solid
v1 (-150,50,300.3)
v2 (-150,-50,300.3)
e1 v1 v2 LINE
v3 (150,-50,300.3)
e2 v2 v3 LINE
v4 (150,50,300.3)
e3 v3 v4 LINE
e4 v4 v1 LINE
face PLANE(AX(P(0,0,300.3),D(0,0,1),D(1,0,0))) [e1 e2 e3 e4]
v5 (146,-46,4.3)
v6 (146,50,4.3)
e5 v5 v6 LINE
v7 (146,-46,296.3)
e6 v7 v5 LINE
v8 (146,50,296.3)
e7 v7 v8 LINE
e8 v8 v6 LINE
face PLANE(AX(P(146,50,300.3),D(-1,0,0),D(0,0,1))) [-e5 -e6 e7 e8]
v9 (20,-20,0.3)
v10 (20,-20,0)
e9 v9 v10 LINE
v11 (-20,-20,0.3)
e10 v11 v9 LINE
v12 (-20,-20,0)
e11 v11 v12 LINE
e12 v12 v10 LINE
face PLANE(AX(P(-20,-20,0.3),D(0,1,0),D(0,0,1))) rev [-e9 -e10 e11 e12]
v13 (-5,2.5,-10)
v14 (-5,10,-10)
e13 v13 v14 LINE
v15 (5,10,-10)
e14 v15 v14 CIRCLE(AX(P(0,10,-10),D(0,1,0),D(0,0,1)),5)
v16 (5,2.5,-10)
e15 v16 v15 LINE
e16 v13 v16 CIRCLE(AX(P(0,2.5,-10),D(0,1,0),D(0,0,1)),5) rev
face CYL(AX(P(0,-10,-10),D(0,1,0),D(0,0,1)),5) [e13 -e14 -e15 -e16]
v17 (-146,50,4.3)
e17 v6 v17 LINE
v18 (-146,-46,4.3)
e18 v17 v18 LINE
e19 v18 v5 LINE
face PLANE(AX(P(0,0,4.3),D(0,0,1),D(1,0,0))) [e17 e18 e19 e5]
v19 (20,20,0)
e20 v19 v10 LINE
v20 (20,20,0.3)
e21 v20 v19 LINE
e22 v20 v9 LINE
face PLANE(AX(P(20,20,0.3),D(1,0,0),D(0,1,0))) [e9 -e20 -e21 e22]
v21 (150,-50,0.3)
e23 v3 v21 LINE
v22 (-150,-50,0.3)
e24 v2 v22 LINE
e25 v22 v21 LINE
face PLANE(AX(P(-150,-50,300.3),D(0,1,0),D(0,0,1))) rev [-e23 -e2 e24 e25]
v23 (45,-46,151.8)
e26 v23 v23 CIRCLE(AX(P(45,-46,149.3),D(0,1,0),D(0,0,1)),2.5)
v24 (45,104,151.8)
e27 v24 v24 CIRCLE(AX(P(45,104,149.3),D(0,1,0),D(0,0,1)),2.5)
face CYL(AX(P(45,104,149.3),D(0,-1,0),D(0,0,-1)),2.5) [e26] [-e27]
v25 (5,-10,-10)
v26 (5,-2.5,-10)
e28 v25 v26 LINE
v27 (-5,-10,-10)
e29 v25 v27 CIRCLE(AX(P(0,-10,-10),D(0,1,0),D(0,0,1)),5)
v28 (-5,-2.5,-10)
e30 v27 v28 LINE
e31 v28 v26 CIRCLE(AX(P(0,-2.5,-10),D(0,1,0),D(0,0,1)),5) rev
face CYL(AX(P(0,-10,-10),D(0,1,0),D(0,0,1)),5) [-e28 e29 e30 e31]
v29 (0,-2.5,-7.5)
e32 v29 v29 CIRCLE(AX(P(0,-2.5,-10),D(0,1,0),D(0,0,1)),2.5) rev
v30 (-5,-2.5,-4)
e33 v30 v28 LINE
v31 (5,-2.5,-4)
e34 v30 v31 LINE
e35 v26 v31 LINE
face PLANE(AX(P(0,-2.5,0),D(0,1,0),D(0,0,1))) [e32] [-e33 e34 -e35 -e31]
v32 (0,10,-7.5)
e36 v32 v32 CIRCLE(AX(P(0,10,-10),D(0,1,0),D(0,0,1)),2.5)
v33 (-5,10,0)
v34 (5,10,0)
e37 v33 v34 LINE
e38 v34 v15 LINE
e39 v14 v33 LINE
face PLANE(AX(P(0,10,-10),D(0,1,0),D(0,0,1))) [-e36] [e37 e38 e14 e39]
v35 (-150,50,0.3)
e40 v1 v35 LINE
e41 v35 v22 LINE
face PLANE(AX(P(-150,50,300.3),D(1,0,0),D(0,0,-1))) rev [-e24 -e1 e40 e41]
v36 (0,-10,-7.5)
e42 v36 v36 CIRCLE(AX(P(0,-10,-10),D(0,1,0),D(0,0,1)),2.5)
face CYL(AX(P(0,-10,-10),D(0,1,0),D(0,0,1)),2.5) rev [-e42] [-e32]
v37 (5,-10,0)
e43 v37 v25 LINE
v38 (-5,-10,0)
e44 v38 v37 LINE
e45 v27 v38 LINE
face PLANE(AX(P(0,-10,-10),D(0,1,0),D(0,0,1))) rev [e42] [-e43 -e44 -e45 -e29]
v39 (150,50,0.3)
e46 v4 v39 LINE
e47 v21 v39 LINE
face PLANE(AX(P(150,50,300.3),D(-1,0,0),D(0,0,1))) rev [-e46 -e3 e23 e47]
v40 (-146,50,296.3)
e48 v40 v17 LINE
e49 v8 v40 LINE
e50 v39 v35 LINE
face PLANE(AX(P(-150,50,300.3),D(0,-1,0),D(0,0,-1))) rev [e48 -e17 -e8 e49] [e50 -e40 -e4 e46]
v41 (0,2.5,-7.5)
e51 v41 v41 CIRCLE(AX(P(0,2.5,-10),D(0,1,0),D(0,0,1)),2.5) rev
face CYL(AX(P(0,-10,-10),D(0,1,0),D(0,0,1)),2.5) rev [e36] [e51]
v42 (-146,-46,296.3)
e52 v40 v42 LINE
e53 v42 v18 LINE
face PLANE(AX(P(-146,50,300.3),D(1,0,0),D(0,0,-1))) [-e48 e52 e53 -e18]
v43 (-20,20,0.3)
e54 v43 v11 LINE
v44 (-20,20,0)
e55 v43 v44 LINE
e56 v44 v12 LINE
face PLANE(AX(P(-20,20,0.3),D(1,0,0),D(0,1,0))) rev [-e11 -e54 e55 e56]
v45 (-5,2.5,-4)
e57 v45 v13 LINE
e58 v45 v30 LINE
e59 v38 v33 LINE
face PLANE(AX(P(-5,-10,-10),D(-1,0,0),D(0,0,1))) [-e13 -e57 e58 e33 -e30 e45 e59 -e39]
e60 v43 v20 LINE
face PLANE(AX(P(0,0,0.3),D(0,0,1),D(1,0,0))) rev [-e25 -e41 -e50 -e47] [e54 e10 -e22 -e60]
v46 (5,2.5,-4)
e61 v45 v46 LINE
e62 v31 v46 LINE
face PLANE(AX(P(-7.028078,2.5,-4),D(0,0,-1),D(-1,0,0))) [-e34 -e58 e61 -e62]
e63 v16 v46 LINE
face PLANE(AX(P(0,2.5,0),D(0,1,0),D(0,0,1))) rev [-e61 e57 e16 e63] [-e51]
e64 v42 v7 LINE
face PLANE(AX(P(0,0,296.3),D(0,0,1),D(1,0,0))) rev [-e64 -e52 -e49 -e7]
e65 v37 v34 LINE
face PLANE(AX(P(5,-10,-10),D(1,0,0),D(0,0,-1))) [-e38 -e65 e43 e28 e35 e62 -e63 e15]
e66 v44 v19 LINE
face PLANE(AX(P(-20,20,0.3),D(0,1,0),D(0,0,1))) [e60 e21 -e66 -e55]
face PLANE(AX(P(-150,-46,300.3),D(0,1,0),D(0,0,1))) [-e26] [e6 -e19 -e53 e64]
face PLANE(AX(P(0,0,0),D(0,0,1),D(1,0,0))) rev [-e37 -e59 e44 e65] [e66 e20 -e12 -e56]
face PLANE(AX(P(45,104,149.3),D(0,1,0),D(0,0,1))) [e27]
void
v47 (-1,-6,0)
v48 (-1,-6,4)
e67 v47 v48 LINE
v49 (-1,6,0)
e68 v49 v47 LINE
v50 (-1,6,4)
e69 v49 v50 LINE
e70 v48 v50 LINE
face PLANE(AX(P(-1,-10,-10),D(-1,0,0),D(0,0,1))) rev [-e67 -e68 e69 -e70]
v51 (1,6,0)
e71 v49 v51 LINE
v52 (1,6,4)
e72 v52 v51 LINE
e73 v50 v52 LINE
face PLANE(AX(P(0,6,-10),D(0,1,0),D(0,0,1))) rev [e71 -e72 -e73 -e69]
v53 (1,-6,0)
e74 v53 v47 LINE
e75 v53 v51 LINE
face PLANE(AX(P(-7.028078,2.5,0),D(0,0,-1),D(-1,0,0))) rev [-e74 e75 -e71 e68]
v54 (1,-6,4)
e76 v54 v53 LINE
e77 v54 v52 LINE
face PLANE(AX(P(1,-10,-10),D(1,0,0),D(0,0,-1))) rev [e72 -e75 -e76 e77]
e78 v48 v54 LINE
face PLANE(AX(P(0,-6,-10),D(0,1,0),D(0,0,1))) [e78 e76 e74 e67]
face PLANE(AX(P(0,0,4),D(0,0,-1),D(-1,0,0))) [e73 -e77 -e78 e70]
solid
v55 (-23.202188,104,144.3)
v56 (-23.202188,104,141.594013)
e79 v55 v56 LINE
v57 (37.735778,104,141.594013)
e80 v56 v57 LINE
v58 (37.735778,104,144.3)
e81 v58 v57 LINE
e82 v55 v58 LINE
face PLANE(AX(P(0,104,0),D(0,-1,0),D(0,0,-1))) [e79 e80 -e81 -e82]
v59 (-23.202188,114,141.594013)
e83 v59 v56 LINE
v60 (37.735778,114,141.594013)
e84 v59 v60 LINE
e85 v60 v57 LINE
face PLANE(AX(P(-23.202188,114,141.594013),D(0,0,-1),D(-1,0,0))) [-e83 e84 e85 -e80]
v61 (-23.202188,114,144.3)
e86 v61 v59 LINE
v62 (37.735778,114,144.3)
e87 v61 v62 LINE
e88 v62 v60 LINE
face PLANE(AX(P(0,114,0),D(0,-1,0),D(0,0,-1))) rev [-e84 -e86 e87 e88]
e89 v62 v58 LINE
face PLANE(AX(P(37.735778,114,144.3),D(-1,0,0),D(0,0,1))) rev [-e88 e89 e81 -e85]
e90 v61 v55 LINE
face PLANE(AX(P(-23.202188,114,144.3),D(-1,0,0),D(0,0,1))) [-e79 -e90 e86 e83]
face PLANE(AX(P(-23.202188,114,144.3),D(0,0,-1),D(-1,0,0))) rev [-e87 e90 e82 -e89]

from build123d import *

# Parameters (mm, degrees)
CROQUIS1_W                   = 40
CROQUIS1_H                   = 40
SALIENTE_EXTRUIR1_DEPTH      = 0.3
SALIENTE_EXTRUIR2_DEPTH      = 10
SALIENTE_EXTRUIR2_DEPTH_BACK = 10
CROQUIS2_R                   = 2.5
CORTAR_EXTRUIR1_DEPTH        = 2.5
CORTAR_EXTRUIR1_DEPTH_BACK   = 2.5
CROQUIS3_W                   = 14.056155144
CROQUIS3_H                   = 12
CROQUIS4_W                   = 300
CROQUIS4_H                   = 100
SALIENTE_EXTRUIR3_DEPTH      = 300
VACIADO2_START               = 4.3
VACIADO2_OUTLINE_W           = 292
VACIADO2_OUTLINE_H           = 96
VACIADO2_DEPTH               = 292
VACIADO2_START_2             = 4
VACIADO2_2_OUTLINE_W         = 32
VACIADO2_2_OUTLINE_H         = 32
VACIADO2_2_DEPTH             = 0.3
VACIADO2_3_OUTLINE_W         = 2
VACIADO2_3_OUTLINE_H         = 12
VACIADO2_3_DEPTH             = 4
CROQUIS6_W                   = 32
CROQUIS6_H                   = 32
SALIENTE_EXTRUIR4_DEPTH      = 0.3
CROQUIS7_R                   = 2.5
SALIENTE_EXTRUIR5_DEPTH      = 150
CROQUIS8_W                   = 60.937965474
CROQUIS8_H                   = 2.7059869
SALIENTE_EXTRUIR6_DEPTH      = 10


# Read off the part's stored shape, not the designer's step: Vaciado2
with BuildPart() as part:
    # Croquis1 → Saliente-Extruir1 (new body)
    with BuildSketch(Plane.XY):
        Rectangle(CROQUIS1_W, CROQUIS1_H)
    extrude(amount=SALIENTE_EXTRUIR1_DEPTH)

    # Croquis2 → Saliente-Extruir2 (add, two sides: drawn at the far end of the back side and taken through both)
    with BuildSketch(Plane(origin=(0, 0, 0), x_dir=(1, 0, 0), z_dir=(0, 1, 0)).offset(-SALIENTE_EXTRUIR2_DEPTH_BACK)):
        with BuildLine():
            Line((-5, 10), (-5, 0))
            Line((-5, 0), (5, 0))
            Line((5, 0), (5, 10))
            ThreePointArc((5, 10), (0, 15), (-5, 10))
        make_face()
        with Locations(Location((0, 10, 0), (0, 0, 270))):
            Circle(CROQUIS2_R, mode=Mode.SUBTRACT)
    extrude(amount=SALIENTE_EXTRUIR2_DEPTH + SALIENTE_EXTRUIR2_DEPTH_BACK)

    # Croquis3 → Cortar-Extruir1 (cut, two sides: drawn at the far end of the back side and taken through both)
    with BuildSketch(Plane(origin=(0, 0, 0), x_dir=(1, 0, 0), z_dir=(0, 1, 0)).offset(-CORTAR_EXTRUIR1_DEPTH_BACK)):
        with Locations((0, 10)):
            Rectangle(CROQUIS3_W, CROQUIS3_H)
    extrude(amount=CORTAR_EXTRUIR1_DEPTH + CORTAR_EXTRUIR1_DEPTH_BACK, mode=Mode.SUBTRACT)

    # Croquis4 → Saliente-Extruir3 (add)
    with BuildSketch(Plane.XY.offset(0.3)):
        Rectangle(CROQUIS4_W, CROQUIS4_H)
    extrude(amount=SALIENTE_EXTRUIR3_DEPTH)

    # Vaciado2 outline → Vaciado2 (cut)
    with BuildSketch(Plane.XY.offset(VACIADO2_START)):
        with Locations((0, 2)):
            Rectangle(VACIADO2_OUTLINE_W, VACIADO2_OUTLINE_H)
    extrude(amount=VACIADO2_DEPTH, mode=Mode.SUBTRACT)

    # Vaciado2 2 outline → Vaciado2 2 (cut)
    with BuildSketch(Plane.XY.offset(VACIADO2_START_2)):
        Rectangle(VACIADO2_2_OUTLINE_W, VACIADO2_2_OUTLINE_H)
    extrude(amount=VACIADO2_2_DEPTH, mode=Mode.SUBTRACT)

    # Vaciado2 3 outline → Vaciado2 3 (cut)
    with BuildSketch(Plane.XY):
        Rectangle(VACIADO2_3_OUTLINE_W, VACIADO2_3_OUTLINE_H)
    extrude(amount=VACIADO2_3_DEPTH, mode=Mode.SUBTRACT)

    # Croquis6 → Saliente-Extruir4 (add)
    with BuildSketch(Plane.XY.offset(4)):
        Rectangle(CROQUIS6_W, CROQUIS6_H)
    extrude(amount=SALIENTE_EXTRUIR4_DEPTH)

    # Croquis7 → Saliente-Extruir5 (add)
    with BuildSketch(Plane(origin=(0, -46, 0), x_dir=(1, 0, 0), z_dir=(0, 1, 0))):
        with Locations(Location((45, -149.3, 0), (0, 0, 270))):
            Circle(CROQUIS7_R)
    extrude(amount=SALIENTE_EXTRUIR5_DEPTH)


with BuildPart() as body_2:
    # Croquis8 → Saliente-Extruir6 (new body)
    with BuildSketch(Plane(origin=(0, 104, 0), x_dir=(1, 0, 0), z_dir=(0, 1, 0))):
        with Locations((7.266795091, -142.94700655)):
            Rectangle(CROQUIS8_W, CROQUIS8_H)
    extrude(amount=SALIENTE_EXTRUIR6_DEPTH)


solid = Compound([part.part, body_2.part])
